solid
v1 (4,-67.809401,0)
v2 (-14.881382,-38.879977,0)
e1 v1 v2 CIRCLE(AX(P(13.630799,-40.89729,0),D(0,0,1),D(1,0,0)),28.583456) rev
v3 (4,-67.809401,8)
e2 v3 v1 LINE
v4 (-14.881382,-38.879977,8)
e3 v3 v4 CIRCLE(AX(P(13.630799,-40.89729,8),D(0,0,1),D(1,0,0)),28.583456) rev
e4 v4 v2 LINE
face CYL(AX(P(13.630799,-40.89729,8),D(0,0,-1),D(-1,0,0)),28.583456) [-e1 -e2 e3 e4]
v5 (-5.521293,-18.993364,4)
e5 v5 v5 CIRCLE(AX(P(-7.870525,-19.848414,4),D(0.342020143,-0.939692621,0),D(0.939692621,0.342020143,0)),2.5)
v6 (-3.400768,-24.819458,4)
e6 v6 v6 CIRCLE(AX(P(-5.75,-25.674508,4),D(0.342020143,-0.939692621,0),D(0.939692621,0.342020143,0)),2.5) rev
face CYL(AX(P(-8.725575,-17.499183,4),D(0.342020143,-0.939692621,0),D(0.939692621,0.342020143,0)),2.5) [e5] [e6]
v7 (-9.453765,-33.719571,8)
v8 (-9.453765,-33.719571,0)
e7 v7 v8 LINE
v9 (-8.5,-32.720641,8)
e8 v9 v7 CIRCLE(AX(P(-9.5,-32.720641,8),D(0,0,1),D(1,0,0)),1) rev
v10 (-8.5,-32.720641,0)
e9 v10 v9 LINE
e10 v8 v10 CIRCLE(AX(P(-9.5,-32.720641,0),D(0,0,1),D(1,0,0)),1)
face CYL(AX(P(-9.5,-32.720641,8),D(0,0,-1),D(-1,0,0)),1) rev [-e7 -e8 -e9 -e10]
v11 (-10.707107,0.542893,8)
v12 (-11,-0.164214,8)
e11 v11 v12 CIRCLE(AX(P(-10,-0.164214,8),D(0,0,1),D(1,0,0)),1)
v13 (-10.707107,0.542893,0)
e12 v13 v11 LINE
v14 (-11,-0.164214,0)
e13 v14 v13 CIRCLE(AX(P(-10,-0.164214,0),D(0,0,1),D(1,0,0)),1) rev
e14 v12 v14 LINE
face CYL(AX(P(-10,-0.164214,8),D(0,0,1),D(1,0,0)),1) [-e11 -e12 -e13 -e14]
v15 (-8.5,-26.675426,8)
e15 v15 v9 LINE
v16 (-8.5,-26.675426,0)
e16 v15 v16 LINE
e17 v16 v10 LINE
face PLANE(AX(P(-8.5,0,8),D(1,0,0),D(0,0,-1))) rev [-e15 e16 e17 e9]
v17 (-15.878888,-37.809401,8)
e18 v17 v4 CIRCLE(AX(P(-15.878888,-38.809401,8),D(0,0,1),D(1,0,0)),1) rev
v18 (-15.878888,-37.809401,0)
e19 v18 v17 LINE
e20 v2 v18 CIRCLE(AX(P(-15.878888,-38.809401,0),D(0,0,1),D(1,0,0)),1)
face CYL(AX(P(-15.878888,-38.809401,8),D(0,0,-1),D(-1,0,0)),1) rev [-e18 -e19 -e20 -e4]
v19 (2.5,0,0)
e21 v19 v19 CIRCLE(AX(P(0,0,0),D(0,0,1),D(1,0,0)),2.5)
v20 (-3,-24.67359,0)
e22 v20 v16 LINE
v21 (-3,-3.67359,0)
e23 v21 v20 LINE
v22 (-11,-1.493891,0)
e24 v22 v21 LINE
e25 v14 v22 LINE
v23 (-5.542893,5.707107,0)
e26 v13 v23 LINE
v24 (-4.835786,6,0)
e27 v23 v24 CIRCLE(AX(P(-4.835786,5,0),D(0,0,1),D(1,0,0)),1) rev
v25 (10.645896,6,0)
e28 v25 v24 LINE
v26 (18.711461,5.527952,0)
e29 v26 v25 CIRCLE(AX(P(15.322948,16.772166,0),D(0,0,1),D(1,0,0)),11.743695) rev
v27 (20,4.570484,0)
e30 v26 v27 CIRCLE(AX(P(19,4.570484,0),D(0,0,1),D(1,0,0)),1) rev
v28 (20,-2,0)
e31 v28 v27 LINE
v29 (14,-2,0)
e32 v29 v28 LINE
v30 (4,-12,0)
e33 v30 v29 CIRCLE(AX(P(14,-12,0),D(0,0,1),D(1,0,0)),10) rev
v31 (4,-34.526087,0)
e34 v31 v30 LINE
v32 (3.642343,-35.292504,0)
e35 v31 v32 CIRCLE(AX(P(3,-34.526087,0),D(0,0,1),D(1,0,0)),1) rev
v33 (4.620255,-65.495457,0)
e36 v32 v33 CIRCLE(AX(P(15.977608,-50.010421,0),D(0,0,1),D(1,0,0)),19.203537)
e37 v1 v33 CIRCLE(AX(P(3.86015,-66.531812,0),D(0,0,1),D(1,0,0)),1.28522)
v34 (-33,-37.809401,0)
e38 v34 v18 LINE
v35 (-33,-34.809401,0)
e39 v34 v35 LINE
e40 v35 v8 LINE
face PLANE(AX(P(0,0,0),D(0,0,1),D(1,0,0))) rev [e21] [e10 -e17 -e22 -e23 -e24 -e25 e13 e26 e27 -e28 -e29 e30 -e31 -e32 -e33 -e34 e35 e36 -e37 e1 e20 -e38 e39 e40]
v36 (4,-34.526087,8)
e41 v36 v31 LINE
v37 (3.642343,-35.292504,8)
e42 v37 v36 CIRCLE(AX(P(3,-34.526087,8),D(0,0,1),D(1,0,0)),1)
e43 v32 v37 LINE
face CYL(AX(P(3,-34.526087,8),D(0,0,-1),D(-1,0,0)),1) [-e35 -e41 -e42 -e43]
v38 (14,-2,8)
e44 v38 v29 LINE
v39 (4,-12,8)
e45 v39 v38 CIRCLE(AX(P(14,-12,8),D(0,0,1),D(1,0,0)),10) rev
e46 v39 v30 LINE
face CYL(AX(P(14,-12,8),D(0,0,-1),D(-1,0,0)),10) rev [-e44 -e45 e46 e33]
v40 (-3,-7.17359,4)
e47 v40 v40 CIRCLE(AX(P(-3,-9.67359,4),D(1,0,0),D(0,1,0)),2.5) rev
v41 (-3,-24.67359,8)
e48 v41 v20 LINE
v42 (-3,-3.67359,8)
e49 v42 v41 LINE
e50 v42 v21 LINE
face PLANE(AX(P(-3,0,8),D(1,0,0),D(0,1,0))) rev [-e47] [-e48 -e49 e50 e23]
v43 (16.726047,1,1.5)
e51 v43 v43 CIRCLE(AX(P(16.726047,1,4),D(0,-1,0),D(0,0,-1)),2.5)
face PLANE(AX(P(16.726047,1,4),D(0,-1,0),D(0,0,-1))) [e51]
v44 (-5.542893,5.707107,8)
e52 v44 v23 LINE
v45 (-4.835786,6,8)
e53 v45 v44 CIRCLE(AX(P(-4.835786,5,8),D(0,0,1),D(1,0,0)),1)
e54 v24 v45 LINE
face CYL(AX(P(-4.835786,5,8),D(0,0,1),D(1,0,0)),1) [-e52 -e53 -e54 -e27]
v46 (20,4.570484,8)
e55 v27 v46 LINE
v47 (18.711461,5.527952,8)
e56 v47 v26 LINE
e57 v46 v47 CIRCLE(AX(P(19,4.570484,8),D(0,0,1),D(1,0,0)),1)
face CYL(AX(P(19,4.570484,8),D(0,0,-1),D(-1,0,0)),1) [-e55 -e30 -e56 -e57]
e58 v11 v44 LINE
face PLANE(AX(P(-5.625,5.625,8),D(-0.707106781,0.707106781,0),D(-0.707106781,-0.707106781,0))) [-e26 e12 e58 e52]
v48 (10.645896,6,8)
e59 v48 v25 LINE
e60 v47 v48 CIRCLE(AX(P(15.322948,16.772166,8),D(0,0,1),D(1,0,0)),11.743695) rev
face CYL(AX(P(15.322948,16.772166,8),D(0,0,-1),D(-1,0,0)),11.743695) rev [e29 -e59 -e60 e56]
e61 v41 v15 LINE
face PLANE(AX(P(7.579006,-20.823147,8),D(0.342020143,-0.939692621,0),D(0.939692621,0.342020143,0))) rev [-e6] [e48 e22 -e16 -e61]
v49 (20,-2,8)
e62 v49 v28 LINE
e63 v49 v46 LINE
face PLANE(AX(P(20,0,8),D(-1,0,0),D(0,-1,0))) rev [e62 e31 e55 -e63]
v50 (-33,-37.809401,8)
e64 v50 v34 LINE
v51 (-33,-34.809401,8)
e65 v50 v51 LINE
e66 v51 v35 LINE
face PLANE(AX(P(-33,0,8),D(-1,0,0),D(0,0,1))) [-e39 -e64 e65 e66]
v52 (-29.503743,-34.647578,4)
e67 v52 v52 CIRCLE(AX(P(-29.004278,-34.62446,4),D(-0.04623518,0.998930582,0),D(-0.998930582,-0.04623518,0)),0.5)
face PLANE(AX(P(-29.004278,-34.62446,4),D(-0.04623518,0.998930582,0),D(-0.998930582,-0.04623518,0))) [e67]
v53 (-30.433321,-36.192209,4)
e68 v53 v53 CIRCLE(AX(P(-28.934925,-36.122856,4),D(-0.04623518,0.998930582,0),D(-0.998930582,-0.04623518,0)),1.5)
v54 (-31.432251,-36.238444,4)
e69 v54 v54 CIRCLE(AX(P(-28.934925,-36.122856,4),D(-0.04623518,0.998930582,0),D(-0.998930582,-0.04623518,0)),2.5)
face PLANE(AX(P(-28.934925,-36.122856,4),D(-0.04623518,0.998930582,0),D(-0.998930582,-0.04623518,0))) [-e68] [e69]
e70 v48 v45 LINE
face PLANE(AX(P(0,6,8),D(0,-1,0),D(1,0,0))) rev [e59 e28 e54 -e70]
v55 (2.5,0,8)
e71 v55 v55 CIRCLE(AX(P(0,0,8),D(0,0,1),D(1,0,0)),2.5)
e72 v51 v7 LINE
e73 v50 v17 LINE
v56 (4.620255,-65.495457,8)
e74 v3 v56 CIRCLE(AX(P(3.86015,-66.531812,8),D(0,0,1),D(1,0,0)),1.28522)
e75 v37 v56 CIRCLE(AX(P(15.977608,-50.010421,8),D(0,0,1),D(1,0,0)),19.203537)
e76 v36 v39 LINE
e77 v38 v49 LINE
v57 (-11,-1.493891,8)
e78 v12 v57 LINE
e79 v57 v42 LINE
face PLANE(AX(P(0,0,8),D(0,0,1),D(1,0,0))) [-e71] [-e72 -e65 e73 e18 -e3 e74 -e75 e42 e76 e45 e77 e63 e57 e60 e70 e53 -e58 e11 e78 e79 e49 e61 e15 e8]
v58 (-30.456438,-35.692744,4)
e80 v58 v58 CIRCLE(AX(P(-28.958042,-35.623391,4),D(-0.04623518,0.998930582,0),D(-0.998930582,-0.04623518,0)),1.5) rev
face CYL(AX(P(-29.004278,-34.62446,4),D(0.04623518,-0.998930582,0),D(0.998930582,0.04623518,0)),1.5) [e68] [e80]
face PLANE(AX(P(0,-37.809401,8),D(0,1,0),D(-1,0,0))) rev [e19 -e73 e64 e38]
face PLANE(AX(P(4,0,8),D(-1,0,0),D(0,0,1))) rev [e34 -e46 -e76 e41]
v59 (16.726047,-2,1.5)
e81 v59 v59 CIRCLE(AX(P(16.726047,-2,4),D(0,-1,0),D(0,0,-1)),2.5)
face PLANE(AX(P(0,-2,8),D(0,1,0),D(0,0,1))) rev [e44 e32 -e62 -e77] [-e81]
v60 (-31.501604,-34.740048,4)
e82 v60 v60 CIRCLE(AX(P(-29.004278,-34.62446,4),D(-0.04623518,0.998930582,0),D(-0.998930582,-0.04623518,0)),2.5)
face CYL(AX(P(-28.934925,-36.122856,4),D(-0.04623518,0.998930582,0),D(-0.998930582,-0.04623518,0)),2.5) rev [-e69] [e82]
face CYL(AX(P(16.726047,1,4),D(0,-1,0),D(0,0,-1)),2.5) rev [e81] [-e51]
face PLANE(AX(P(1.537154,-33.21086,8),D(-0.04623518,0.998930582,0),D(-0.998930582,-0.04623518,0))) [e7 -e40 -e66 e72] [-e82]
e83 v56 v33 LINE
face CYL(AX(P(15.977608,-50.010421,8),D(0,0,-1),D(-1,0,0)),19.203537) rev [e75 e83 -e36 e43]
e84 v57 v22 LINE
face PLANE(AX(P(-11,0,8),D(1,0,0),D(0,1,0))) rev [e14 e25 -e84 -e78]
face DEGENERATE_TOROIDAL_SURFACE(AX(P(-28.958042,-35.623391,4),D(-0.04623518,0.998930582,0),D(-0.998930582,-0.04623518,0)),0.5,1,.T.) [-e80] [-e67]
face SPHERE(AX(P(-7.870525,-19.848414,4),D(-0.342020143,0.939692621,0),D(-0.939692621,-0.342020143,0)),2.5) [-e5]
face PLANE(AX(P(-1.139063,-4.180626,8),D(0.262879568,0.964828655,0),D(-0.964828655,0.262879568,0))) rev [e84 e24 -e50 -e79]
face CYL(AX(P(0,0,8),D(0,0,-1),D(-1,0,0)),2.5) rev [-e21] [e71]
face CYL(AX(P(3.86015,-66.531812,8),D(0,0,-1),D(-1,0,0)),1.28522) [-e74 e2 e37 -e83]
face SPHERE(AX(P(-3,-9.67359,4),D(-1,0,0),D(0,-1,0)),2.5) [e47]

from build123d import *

# Parameters (mm, degrees)
SKETCH_1_R          = 2.5
EXTRUDE_1_DEPTH     = 8
FILLET_8_R          = 1
SKETCH_2_R          = 2.5
EXTRUDE_2_DEPTH     = 2.5
FILLET_7_R          = 2.5
SKETCH_3_R          = 2.5
EXTRUDE_3_DEPTH     = 8.7
FILLET_4_R          = 2.5
FILLET_5_R          = 1
FILLET_6_R          = 1
SKETCH_4_R          = 2.5
CUT_EXTRUDE_1_DEPTH = 3
SKETCH_5_R          = 2.5
CUT_EXTRUDE_2_DEPTH = 1.5
SKETCH_7_R          = 1.5
EXTRUDE_4_DEPTH     = 1.5
FILLET_9_R          = 1


with BuildPart() as part:
    # 스케치1 → 보스-돌출1 (new body)
    with BuildSketch(Plane.XY):
        with BuildLine():
            Line((-11, 0.25), (-5.25, 6))
            Line((-5.25, 6), (10.645895628, 6))
            ThreePointArc((10.645895628, 6), (15.322947814, 5.028470802), (20, 6))
            Line((20, 6), (20, -2))
            Line((20, -2), (14, -2))
            ThreePointArc((14, -2), (6.928932188, -4.928932188), (4, -12))
            Line((4, -12), (4, -35))
            ThreePointArc((4, -35), (-3.221957743, -50.400925483), (4.620254931, -65.495456935))
            ThreePointArc((4.620254931, -65.495456935), (5.101546116, -66.864569331), (4.000000416, -67.809401077))
            ThreePointArc((4.000000416, -67.809401077), (-10.595076269, -56.067028756), (-14.785374908, -37.809401077))
            Line((-14.785374908, -37.809401077), (-33, -37.809401077))
            Line((-33, -37.809401077), (-33, -34.809401077))
            Line((-33, -34.809401077), (-8.5, -33.675426481))
            Line((-8.5, -33.675426481), (-8.5, -26.675426481))
            Line((-8.5, -26.675426481), (-3, -24.673590192))
            Line((-3, -24.673590192), (-3, -3.673590192))
            Line((-3, -3.673590192), (-11, -1.493890685))
            Line((-11, -1.493890685), (-11, 0.25))
        make_face()
        Circle(SKETCH_1_R, mode=Mode.SUBTRACT)
    extrude(amount=EXTRUDE_1_DEPTH)

    # 필렛8
    fillet_8_edges = [part.edges().sort_by_distance(p)[0] for p in [
        (4, -35, 4),
        (-14.785374908, -37.809401077, 4),
        (-8.5, -33.675426481, 4),
    ]]
    fillet(fillet_8_edges, radius=FILLET_8_R)

    # 스케치2 → 보스-돌출2 (add)
    with BuildSketch(Plane.ZY.offset(3)):
        with Locations(Location((4, -9.673590192, 0), (0, 0, 90))):
            Circle(SKETCH_2_R)
    extrude(amount=EXTRUDE_2_DEPTH)

    # 필렛7
    fillet_7_edges = [part.edges().sort_by_distance(p)[0] for p in [
        (-5.5, -12.173590192, 4),
    ]]
    fillet(fillet_7_edges, radius=FILLET_7_R - 0.0001)  # a hair under: the kernel refuses the full size

    # 스케치3 → 보스-돌출3 (add)
    with BuildSketch(Plane(origin=(7.579005696, -20.823147011, 0), x_dir=(0.9396926207859105, 0.34202014332566305, 0), z_dir=(-0.34202014332566305, 0.9396926207859105, 0))):
        with Locations((-14.184431591, -4)):
            Circle(SKETCH_3_R)
    extrude(amount=EXTRUDE_3_DEPTH)

    # 필렛4
    fillet_4_edges = [part.edges().sort_by_distance(p)[0] for p in [
        (-11.074806799, -18.354232894, 4),
    ]]
    fillet(fillet_4_edges, radius=FILLET_4_R)

    # 필렛5
    fillet_5_edges = [part.edges().sort_by_distance(p)[0] for p in [
        (20, 6, 4),
    ]]
    fillet(fillet_5_edges, radius=FILLET_5_R)

    # 필렛6
    fillet_6_edges = [part.edges().sort_by_distance(p)[0] for p in [
        (-11, 0.25, 4),
        (-5.25, 6, 4),
    ]]
    fillet(fillet_6_edges, radius=FILLET_6_R)

    # 스케치4 → 컷-돌출1 (cut)
    with BuildSketch(Plane.XZ.offset(2)):
        with Locations(Location((16.726046575, 4, 0), (0, 0, 270))):
            Circle(SKETCH_4_R)
    extrude(amount=-CUT_EXTRUDE_1_DEPTH, mode=Mode.SUBTRACT)

    # 스케치5 → 컷-돌출2 (cut)
    with BuildSketch(Plane(origin=(1.537153943, -33.210860048, 0), x_dir=(0.9989305822499971, 0.046235179740992706, 0), z_dir=(-0.046235179740992706, 0.9989305822499971, 0))):
        with Locations(Location((-30.57412813, -4, 0), (0, 0, 180))):
            Circle(SKETCH_5_R)
    extrude(amount=-CUT_EXTRUDE_2_DEPTH, mode=Mode.SUBTRACT)

    # 스케치7 → 보스-돌출4 (add)
    with BuildSketch(Plane(origin=(1.606506713, -34.709255922, 0), x_dir=(0.9989305822499971, 0.04623517974099271, 0), z_dir=(-0.04623517974099271, 0.9989305822499971, 0))):
        with Locations(Location((-30.57412813, -4, 0), (0, 0, 180))):
            Circle(SKETCH_7_R)
    extrude(amount=EXTRUDE_4_DEPTH)

    # 필렛9
    fillet_9_edges = [part.edges().sort_by_distance(p)[0] for p in [
        (-27.505881798, -34.555107588, 4),
    ]]
    fillet(fillet_9_edges, radius=FILLET_9_R)


solid = part.part
